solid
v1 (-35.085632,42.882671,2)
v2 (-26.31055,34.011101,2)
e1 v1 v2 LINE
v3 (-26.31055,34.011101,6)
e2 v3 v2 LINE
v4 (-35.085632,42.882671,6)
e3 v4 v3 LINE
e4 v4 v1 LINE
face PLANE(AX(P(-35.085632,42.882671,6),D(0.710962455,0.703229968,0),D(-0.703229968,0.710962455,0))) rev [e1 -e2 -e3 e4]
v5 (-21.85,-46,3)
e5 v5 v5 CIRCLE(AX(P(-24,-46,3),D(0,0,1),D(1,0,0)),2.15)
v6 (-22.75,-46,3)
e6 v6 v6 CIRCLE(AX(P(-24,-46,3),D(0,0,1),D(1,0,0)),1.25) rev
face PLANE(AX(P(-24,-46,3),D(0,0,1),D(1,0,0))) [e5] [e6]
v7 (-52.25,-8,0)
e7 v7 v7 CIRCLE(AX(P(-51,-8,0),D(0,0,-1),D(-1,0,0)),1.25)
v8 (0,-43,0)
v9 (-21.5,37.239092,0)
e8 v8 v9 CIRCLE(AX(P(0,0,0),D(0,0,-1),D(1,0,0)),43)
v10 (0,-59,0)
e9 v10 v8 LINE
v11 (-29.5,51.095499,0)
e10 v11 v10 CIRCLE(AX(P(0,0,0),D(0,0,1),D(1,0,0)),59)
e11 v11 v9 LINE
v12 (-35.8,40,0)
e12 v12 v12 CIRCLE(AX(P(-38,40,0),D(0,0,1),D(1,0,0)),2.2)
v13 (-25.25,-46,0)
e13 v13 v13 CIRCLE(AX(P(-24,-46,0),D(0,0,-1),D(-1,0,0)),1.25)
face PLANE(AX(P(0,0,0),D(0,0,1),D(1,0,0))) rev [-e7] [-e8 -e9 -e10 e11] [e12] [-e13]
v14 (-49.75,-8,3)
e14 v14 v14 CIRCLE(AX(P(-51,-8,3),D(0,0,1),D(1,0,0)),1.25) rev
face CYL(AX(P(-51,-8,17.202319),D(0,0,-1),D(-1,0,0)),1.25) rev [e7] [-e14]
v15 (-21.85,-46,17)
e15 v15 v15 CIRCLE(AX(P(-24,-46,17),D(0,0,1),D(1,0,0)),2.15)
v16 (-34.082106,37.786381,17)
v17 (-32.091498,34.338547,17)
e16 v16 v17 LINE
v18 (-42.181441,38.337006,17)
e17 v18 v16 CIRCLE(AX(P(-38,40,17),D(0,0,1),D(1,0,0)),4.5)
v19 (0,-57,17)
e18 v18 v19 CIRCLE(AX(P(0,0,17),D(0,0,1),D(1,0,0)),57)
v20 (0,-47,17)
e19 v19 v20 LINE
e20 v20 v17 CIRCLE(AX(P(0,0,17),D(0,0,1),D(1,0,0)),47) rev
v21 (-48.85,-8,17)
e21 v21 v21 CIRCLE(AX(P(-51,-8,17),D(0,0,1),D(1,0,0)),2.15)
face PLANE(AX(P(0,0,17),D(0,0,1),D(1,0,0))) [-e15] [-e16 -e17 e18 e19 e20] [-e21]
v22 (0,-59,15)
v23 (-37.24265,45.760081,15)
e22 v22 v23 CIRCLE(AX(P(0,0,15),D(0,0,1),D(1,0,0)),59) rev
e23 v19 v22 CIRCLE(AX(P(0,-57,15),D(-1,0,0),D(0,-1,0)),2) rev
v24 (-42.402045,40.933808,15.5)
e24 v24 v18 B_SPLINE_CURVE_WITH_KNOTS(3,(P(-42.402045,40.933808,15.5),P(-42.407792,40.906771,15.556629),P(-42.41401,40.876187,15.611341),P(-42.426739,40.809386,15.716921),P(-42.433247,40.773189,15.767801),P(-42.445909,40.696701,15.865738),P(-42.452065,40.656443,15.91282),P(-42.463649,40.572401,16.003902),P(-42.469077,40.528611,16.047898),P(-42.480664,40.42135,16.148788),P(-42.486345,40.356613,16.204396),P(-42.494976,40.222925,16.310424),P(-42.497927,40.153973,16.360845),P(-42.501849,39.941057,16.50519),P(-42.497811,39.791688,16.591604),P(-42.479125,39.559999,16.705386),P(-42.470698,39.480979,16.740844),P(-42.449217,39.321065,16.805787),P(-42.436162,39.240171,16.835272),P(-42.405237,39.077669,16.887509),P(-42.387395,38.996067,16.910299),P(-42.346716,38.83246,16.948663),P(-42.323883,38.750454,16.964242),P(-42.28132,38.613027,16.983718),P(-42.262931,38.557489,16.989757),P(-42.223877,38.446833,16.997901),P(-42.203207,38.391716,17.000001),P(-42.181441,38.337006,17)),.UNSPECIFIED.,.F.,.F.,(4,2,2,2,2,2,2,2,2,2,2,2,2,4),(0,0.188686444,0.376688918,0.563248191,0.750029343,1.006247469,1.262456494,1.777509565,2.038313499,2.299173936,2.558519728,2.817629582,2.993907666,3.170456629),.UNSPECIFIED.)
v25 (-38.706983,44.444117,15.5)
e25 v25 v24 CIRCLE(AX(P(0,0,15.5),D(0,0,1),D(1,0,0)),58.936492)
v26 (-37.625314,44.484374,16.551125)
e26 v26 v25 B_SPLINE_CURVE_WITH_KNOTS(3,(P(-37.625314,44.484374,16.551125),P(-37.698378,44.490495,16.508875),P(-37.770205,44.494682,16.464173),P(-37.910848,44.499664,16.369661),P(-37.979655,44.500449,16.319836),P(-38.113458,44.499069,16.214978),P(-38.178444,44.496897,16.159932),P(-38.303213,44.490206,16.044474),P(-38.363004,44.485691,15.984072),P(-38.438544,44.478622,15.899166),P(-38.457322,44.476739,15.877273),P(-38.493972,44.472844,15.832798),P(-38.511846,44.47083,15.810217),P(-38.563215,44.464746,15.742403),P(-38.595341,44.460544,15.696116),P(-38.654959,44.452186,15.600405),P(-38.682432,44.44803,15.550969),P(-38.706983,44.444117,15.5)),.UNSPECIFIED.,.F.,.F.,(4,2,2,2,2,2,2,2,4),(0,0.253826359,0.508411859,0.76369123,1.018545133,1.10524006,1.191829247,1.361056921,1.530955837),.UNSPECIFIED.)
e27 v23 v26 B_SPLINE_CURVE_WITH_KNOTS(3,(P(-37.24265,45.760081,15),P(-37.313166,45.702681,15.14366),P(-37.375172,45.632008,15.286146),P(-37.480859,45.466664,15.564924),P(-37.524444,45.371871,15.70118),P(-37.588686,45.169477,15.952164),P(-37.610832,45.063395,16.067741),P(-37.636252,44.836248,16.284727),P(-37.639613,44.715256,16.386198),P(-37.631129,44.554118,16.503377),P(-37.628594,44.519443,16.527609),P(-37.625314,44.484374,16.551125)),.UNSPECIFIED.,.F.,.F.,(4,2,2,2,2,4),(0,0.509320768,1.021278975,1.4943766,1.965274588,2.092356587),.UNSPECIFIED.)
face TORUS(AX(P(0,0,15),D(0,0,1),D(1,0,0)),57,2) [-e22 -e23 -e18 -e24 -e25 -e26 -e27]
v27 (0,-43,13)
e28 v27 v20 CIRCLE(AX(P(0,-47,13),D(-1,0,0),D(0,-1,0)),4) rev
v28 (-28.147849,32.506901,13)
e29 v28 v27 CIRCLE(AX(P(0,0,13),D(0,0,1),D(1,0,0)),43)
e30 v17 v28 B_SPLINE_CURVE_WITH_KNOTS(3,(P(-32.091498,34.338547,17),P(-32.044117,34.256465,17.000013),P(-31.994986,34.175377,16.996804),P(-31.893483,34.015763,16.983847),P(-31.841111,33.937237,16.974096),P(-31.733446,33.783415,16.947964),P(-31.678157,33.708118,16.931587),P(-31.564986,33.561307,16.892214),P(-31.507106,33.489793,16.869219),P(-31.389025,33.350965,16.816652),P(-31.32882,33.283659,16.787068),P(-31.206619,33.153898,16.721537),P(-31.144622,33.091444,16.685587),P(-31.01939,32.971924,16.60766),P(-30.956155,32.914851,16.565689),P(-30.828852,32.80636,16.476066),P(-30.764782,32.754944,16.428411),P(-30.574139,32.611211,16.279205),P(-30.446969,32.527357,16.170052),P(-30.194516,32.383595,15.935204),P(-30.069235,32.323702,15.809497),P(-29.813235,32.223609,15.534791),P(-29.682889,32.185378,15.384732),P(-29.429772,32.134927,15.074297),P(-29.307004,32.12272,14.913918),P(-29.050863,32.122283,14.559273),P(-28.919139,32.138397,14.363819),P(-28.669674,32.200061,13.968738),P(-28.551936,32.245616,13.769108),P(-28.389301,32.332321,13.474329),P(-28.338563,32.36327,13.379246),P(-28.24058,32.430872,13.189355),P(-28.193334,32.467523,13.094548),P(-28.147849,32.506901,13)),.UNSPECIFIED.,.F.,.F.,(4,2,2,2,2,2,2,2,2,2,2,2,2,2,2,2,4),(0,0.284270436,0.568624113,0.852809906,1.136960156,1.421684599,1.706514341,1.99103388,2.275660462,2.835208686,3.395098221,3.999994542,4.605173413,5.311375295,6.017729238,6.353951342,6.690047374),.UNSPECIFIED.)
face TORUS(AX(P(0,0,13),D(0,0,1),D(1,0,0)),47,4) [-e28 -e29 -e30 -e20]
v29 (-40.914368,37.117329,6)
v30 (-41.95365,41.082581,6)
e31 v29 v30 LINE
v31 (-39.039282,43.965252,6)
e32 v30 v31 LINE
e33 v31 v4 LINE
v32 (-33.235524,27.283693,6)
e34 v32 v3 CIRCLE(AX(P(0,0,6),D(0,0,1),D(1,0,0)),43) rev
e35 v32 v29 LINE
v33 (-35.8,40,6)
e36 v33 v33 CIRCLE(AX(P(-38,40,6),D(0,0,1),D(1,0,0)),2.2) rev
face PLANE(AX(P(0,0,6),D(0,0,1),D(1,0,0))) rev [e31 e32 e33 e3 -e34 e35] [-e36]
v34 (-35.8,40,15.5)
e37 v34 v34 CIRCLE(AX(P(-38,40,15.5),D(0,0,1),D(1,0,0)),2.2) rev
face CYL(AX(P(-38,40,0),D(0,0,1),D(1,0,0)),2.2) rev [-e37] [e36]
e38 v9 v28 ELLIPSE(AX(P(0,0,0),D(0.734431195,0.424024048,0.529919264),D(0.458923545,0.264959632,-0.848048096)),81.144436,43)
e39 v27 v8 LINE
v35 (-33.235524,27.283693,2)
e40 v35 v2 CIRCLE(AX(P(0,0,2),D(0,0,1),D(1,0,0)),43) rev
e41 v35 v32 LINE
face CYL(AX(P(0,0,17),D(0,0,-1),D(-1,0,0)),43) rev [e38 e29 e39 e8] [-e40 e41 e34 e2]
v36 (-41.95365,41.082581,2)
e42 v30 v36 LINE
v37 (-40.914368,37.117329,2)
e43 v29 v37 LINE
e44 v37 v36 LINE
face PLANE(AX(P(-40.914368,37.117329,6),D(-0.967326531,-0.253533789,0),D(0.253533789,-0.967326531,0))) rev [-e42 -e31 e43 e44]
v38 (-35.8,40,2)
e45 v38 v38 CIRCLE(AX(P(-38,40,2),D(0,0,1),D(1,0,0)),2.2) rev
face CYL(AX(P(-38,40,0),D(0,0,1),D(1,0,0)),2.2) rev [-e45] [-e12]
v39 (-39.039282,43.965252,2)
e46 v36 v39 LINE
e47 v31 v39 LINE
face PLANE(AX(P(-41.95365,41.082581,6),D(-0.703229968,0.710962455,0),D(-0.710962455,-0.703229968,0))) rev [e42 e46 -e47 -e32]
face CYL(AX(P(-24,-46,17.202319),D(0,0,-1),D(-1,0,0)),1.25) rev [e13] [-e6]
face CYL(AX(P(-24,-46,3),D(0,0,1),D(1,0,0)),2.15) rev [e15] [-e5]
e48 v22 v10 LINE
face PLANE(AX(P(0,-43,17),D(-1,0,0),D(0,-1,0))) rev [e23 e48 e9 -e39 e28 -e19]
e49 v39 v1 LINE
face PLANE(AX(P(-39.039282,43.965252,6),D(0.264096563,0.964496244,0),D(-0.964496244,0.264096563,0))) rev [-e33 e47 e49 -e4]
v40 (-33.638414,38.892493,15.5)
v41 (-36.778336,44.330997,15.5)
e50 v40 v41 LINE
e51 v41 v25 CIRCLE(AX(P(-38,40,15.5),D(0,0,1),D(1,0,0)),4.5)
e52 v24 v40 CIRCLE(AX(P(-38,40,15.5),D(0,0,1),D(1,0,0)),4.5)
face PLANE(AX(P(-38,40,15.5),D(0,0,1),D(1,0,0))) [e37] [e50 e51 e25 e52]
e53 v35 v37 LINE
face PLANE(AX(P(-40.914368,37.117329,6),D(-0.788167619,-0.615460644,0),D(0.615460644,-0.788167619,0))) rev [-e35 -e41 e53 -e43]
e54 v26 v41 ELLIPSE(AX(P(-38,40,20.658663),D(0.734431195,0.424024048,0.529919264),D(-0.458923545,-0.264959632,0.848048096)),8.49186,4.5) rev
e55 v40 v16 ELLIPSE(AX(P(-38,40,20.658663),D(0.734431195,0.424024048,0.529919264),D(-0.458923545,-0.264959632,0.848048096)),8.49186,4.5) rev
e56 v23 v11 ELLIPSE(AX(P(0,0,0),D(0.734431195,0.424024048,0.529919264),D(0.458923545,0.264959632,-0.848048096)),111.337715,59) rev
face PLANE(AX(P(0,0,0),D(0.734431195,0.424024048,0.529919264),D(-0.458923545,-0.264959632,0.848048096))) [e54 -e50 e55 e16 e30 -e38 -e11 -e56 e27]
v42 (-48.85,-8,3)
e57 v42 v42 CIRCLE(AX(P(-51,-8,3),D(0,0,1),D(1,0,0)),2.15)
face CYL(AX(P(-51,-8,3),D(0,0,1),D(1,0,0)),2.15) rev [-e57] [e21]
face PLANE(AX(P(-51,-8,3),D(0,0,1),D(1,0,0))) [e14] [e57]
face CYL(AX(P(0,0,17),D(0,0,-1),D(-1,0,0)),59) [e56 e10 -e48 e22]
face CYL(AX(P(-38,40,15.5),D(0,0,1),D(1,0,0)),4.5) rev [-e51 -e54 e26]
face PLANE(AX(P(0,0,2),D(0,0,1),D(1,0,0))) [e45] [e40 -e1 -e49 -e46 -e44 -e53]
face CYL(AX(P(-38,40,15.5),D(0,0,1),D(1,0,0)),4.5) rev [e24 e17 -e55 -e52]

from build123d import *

# Parameters (mm, degrees)
BOSS_EXTRUDE1_DEPTH = 17
SKETCH2_R           = 2.2
CUT_EXTRUDE1_DEPTH  = 86.152803829
CUT_EXTRUDE2_DEPTH  = 86.152803829
DRAFT1_ANGLE        = -32
SKETCH4_R           = 4.5
CUT_EXTRUDE3_DEPTH  = 1.5
FILLET1_R           = 4
CUT_EXTRUDE4_START  = -2
CUT_EXTRUDE4_DEPTH  = 4
SKETCH10_R          = 1.25
CUT_EXTRUDE5_DEPTH  = 86.152803849
SKETCH11_R          = 2.15
CUT_EXTRUDE6_DEPTH  = 14
FILLET2_R           = 2


with BuildPart() as part:
    # Sketch1 → Boss-Extrude1 (new body)
    with BuildSketch(Plane.XY):
        with BuildLine():
            Line((0, 59), (0, 43))
            ThreePointArc((0, 43), (-43, 0), (0, -43))
            Line((0, -43), (0, -59))
            ThreePointArc((0, -59), (-59, 0), (0, 59))
        make_face()
    extrude(amount=BOSS_EXTRUDE1_DEPTH)

    # Sketch2 → Cut-Extrude1 (cut, through all)
    with BuildSketch(Plane.XY.offset(17)):
        with Locations((-38, 40)):
            Circle(SKETCH2_R)
    extrude(amount=-CUT_EXTRUDE1_DEPTH, mode=Mode.SUBTRACT)

    # Sketch3 → Cut-Extrude2 (cut, through all)
    with BuildSketch(Plane.XY.offset(17)):
        Polygon((0, 0), (-48.717134113, 84.380551482), (0, 84.380551482), align=None)
    extrude(amount=-CUT_EXTRUDE2_DEPTH, mode=Mode.SUBTRACT)

    # Draft1
    draft1_faces = [part.faces().sort_by_distance(p)[0] for p in [
        (-25.5, 44.167295593, 8.5),
    ]]
    draft(draft1_faces, Plane(origin=(0, 0, 0), x_dir=(-1, 0, 0), z_dir=(0, 0, -1)), DRAFT1_ANGLE)

    # Sketch4 → Cut-Extrude3 (cut)
    with BuildSketch(Plane.XY.offset(17)):
        with Locations((-38, 40)):
            Circle(SKETCH4_R)
    extrude(amount=-CUT_EXTRUDE3_DEPTH, mode=Mode.SUBTRACT)

    # Fillet1
    fillet1_edges = [part.edges().sort_by_distance(p)[0] for p in [
        (-39.826243941, -16.213275226, 17),
    ]]
    fillet(fillet1_edges, radius=FILLET1_R)

    # Sketch9 → Cut-Extrude4 (cut)
    with BuildSketch(Plane(origin=(0, 0, 0), x_dir=(-1, 0, 0), z_dir=(0, 0, -1)).offset(CUT_EXTRUDE4_START)):
        Polygon((40.91436799, 37.11732892), (41.953650381, 41.082581175), (39.039282391, 43.965252255), (35.08563201, 42.88267108), (21.021032653, 28.663421982), (28.6051551, 21.353976547), align=None)
    extrude(amount=-CUT_EXTRUDE4_DEPTH, mode=Mode.SUBTRACT)

    # Sketch10 → Cut-Extrude5 (cut, through all)
    with BuildSketch(Plane(origin=(0, 0, 0), x_dir=(-1, 0, 0), z_dir=(0, 0, -1))):
        with Locations((24, -46)):
            Circle(SKETCH10_R)
        with Locations((51, -8)):
            Circle(SKETCH10_R)
    extrude(amount=-CUT_EXTRUDE5_DEPTH, mode=Mode.SUBTRACT)

    # Sketch11 → Cut-Extrude6 (cut)
    with BuildSketch(Plane.XY.offset(17)):
        with Locations((-51, -8)):
            Circle(SKETCH11_R)
        with Locations((-24, -46)):
            Circle(SKETCH11_R)
    extrude(amount=-CUT_EXTRUDE6_DEPTH, mode=Mode.SUBTRACT)

    # Fillet2
    # the kernel refuses this fillet: 2 mm, written as the material it takes off along each edge
    with BuildSketch(Plane(origin=(0, 0, 17), x_dir=(-0.7194630608537799, 0.6945307077926146, 0), z_dir=(-0.6945307077926146, -0.7194630608537799, 0))) as fillet2_piece_1:
        with BuildLine():
            CenterArc((59 - FILLET2_R, FILLET2_R), FILLET2_R, 270, 90)
            Line((59 - FILLET2_R, 0), (59, 0))
            Line((59, 0), (59, FILLET2_R))
        make_face()
    revolve(axis=Axis((0, 0, 17), (0, 0, -1)), revolution_arc=10.493238867, mode=Mode.SUBTRACT)
    with BuildSketch(Plane(origin=(0, 0, 17), x_dir=(0.08471968524952049, -0.9964048248233356, 0), z_dir=(0.9964048248233356, 0.08471968524952049, 0))) as fillet2_piece_2:
        with BuildLine():
            CenterArc((59 - FILLET2_R, FILLET2_R), FILLET2_R, 270, 90)
            Line((59, FILLET2_R), (59, 0))
            Line((59, 0), (59 - FILLET2_R, 0))
        make_face()
    revolve(axis=Axis((0, 0, 17), (0, 0, -1)), revolution_arc=143.812006021, mode=Mode.SUBTRACT)


solid = part.part
